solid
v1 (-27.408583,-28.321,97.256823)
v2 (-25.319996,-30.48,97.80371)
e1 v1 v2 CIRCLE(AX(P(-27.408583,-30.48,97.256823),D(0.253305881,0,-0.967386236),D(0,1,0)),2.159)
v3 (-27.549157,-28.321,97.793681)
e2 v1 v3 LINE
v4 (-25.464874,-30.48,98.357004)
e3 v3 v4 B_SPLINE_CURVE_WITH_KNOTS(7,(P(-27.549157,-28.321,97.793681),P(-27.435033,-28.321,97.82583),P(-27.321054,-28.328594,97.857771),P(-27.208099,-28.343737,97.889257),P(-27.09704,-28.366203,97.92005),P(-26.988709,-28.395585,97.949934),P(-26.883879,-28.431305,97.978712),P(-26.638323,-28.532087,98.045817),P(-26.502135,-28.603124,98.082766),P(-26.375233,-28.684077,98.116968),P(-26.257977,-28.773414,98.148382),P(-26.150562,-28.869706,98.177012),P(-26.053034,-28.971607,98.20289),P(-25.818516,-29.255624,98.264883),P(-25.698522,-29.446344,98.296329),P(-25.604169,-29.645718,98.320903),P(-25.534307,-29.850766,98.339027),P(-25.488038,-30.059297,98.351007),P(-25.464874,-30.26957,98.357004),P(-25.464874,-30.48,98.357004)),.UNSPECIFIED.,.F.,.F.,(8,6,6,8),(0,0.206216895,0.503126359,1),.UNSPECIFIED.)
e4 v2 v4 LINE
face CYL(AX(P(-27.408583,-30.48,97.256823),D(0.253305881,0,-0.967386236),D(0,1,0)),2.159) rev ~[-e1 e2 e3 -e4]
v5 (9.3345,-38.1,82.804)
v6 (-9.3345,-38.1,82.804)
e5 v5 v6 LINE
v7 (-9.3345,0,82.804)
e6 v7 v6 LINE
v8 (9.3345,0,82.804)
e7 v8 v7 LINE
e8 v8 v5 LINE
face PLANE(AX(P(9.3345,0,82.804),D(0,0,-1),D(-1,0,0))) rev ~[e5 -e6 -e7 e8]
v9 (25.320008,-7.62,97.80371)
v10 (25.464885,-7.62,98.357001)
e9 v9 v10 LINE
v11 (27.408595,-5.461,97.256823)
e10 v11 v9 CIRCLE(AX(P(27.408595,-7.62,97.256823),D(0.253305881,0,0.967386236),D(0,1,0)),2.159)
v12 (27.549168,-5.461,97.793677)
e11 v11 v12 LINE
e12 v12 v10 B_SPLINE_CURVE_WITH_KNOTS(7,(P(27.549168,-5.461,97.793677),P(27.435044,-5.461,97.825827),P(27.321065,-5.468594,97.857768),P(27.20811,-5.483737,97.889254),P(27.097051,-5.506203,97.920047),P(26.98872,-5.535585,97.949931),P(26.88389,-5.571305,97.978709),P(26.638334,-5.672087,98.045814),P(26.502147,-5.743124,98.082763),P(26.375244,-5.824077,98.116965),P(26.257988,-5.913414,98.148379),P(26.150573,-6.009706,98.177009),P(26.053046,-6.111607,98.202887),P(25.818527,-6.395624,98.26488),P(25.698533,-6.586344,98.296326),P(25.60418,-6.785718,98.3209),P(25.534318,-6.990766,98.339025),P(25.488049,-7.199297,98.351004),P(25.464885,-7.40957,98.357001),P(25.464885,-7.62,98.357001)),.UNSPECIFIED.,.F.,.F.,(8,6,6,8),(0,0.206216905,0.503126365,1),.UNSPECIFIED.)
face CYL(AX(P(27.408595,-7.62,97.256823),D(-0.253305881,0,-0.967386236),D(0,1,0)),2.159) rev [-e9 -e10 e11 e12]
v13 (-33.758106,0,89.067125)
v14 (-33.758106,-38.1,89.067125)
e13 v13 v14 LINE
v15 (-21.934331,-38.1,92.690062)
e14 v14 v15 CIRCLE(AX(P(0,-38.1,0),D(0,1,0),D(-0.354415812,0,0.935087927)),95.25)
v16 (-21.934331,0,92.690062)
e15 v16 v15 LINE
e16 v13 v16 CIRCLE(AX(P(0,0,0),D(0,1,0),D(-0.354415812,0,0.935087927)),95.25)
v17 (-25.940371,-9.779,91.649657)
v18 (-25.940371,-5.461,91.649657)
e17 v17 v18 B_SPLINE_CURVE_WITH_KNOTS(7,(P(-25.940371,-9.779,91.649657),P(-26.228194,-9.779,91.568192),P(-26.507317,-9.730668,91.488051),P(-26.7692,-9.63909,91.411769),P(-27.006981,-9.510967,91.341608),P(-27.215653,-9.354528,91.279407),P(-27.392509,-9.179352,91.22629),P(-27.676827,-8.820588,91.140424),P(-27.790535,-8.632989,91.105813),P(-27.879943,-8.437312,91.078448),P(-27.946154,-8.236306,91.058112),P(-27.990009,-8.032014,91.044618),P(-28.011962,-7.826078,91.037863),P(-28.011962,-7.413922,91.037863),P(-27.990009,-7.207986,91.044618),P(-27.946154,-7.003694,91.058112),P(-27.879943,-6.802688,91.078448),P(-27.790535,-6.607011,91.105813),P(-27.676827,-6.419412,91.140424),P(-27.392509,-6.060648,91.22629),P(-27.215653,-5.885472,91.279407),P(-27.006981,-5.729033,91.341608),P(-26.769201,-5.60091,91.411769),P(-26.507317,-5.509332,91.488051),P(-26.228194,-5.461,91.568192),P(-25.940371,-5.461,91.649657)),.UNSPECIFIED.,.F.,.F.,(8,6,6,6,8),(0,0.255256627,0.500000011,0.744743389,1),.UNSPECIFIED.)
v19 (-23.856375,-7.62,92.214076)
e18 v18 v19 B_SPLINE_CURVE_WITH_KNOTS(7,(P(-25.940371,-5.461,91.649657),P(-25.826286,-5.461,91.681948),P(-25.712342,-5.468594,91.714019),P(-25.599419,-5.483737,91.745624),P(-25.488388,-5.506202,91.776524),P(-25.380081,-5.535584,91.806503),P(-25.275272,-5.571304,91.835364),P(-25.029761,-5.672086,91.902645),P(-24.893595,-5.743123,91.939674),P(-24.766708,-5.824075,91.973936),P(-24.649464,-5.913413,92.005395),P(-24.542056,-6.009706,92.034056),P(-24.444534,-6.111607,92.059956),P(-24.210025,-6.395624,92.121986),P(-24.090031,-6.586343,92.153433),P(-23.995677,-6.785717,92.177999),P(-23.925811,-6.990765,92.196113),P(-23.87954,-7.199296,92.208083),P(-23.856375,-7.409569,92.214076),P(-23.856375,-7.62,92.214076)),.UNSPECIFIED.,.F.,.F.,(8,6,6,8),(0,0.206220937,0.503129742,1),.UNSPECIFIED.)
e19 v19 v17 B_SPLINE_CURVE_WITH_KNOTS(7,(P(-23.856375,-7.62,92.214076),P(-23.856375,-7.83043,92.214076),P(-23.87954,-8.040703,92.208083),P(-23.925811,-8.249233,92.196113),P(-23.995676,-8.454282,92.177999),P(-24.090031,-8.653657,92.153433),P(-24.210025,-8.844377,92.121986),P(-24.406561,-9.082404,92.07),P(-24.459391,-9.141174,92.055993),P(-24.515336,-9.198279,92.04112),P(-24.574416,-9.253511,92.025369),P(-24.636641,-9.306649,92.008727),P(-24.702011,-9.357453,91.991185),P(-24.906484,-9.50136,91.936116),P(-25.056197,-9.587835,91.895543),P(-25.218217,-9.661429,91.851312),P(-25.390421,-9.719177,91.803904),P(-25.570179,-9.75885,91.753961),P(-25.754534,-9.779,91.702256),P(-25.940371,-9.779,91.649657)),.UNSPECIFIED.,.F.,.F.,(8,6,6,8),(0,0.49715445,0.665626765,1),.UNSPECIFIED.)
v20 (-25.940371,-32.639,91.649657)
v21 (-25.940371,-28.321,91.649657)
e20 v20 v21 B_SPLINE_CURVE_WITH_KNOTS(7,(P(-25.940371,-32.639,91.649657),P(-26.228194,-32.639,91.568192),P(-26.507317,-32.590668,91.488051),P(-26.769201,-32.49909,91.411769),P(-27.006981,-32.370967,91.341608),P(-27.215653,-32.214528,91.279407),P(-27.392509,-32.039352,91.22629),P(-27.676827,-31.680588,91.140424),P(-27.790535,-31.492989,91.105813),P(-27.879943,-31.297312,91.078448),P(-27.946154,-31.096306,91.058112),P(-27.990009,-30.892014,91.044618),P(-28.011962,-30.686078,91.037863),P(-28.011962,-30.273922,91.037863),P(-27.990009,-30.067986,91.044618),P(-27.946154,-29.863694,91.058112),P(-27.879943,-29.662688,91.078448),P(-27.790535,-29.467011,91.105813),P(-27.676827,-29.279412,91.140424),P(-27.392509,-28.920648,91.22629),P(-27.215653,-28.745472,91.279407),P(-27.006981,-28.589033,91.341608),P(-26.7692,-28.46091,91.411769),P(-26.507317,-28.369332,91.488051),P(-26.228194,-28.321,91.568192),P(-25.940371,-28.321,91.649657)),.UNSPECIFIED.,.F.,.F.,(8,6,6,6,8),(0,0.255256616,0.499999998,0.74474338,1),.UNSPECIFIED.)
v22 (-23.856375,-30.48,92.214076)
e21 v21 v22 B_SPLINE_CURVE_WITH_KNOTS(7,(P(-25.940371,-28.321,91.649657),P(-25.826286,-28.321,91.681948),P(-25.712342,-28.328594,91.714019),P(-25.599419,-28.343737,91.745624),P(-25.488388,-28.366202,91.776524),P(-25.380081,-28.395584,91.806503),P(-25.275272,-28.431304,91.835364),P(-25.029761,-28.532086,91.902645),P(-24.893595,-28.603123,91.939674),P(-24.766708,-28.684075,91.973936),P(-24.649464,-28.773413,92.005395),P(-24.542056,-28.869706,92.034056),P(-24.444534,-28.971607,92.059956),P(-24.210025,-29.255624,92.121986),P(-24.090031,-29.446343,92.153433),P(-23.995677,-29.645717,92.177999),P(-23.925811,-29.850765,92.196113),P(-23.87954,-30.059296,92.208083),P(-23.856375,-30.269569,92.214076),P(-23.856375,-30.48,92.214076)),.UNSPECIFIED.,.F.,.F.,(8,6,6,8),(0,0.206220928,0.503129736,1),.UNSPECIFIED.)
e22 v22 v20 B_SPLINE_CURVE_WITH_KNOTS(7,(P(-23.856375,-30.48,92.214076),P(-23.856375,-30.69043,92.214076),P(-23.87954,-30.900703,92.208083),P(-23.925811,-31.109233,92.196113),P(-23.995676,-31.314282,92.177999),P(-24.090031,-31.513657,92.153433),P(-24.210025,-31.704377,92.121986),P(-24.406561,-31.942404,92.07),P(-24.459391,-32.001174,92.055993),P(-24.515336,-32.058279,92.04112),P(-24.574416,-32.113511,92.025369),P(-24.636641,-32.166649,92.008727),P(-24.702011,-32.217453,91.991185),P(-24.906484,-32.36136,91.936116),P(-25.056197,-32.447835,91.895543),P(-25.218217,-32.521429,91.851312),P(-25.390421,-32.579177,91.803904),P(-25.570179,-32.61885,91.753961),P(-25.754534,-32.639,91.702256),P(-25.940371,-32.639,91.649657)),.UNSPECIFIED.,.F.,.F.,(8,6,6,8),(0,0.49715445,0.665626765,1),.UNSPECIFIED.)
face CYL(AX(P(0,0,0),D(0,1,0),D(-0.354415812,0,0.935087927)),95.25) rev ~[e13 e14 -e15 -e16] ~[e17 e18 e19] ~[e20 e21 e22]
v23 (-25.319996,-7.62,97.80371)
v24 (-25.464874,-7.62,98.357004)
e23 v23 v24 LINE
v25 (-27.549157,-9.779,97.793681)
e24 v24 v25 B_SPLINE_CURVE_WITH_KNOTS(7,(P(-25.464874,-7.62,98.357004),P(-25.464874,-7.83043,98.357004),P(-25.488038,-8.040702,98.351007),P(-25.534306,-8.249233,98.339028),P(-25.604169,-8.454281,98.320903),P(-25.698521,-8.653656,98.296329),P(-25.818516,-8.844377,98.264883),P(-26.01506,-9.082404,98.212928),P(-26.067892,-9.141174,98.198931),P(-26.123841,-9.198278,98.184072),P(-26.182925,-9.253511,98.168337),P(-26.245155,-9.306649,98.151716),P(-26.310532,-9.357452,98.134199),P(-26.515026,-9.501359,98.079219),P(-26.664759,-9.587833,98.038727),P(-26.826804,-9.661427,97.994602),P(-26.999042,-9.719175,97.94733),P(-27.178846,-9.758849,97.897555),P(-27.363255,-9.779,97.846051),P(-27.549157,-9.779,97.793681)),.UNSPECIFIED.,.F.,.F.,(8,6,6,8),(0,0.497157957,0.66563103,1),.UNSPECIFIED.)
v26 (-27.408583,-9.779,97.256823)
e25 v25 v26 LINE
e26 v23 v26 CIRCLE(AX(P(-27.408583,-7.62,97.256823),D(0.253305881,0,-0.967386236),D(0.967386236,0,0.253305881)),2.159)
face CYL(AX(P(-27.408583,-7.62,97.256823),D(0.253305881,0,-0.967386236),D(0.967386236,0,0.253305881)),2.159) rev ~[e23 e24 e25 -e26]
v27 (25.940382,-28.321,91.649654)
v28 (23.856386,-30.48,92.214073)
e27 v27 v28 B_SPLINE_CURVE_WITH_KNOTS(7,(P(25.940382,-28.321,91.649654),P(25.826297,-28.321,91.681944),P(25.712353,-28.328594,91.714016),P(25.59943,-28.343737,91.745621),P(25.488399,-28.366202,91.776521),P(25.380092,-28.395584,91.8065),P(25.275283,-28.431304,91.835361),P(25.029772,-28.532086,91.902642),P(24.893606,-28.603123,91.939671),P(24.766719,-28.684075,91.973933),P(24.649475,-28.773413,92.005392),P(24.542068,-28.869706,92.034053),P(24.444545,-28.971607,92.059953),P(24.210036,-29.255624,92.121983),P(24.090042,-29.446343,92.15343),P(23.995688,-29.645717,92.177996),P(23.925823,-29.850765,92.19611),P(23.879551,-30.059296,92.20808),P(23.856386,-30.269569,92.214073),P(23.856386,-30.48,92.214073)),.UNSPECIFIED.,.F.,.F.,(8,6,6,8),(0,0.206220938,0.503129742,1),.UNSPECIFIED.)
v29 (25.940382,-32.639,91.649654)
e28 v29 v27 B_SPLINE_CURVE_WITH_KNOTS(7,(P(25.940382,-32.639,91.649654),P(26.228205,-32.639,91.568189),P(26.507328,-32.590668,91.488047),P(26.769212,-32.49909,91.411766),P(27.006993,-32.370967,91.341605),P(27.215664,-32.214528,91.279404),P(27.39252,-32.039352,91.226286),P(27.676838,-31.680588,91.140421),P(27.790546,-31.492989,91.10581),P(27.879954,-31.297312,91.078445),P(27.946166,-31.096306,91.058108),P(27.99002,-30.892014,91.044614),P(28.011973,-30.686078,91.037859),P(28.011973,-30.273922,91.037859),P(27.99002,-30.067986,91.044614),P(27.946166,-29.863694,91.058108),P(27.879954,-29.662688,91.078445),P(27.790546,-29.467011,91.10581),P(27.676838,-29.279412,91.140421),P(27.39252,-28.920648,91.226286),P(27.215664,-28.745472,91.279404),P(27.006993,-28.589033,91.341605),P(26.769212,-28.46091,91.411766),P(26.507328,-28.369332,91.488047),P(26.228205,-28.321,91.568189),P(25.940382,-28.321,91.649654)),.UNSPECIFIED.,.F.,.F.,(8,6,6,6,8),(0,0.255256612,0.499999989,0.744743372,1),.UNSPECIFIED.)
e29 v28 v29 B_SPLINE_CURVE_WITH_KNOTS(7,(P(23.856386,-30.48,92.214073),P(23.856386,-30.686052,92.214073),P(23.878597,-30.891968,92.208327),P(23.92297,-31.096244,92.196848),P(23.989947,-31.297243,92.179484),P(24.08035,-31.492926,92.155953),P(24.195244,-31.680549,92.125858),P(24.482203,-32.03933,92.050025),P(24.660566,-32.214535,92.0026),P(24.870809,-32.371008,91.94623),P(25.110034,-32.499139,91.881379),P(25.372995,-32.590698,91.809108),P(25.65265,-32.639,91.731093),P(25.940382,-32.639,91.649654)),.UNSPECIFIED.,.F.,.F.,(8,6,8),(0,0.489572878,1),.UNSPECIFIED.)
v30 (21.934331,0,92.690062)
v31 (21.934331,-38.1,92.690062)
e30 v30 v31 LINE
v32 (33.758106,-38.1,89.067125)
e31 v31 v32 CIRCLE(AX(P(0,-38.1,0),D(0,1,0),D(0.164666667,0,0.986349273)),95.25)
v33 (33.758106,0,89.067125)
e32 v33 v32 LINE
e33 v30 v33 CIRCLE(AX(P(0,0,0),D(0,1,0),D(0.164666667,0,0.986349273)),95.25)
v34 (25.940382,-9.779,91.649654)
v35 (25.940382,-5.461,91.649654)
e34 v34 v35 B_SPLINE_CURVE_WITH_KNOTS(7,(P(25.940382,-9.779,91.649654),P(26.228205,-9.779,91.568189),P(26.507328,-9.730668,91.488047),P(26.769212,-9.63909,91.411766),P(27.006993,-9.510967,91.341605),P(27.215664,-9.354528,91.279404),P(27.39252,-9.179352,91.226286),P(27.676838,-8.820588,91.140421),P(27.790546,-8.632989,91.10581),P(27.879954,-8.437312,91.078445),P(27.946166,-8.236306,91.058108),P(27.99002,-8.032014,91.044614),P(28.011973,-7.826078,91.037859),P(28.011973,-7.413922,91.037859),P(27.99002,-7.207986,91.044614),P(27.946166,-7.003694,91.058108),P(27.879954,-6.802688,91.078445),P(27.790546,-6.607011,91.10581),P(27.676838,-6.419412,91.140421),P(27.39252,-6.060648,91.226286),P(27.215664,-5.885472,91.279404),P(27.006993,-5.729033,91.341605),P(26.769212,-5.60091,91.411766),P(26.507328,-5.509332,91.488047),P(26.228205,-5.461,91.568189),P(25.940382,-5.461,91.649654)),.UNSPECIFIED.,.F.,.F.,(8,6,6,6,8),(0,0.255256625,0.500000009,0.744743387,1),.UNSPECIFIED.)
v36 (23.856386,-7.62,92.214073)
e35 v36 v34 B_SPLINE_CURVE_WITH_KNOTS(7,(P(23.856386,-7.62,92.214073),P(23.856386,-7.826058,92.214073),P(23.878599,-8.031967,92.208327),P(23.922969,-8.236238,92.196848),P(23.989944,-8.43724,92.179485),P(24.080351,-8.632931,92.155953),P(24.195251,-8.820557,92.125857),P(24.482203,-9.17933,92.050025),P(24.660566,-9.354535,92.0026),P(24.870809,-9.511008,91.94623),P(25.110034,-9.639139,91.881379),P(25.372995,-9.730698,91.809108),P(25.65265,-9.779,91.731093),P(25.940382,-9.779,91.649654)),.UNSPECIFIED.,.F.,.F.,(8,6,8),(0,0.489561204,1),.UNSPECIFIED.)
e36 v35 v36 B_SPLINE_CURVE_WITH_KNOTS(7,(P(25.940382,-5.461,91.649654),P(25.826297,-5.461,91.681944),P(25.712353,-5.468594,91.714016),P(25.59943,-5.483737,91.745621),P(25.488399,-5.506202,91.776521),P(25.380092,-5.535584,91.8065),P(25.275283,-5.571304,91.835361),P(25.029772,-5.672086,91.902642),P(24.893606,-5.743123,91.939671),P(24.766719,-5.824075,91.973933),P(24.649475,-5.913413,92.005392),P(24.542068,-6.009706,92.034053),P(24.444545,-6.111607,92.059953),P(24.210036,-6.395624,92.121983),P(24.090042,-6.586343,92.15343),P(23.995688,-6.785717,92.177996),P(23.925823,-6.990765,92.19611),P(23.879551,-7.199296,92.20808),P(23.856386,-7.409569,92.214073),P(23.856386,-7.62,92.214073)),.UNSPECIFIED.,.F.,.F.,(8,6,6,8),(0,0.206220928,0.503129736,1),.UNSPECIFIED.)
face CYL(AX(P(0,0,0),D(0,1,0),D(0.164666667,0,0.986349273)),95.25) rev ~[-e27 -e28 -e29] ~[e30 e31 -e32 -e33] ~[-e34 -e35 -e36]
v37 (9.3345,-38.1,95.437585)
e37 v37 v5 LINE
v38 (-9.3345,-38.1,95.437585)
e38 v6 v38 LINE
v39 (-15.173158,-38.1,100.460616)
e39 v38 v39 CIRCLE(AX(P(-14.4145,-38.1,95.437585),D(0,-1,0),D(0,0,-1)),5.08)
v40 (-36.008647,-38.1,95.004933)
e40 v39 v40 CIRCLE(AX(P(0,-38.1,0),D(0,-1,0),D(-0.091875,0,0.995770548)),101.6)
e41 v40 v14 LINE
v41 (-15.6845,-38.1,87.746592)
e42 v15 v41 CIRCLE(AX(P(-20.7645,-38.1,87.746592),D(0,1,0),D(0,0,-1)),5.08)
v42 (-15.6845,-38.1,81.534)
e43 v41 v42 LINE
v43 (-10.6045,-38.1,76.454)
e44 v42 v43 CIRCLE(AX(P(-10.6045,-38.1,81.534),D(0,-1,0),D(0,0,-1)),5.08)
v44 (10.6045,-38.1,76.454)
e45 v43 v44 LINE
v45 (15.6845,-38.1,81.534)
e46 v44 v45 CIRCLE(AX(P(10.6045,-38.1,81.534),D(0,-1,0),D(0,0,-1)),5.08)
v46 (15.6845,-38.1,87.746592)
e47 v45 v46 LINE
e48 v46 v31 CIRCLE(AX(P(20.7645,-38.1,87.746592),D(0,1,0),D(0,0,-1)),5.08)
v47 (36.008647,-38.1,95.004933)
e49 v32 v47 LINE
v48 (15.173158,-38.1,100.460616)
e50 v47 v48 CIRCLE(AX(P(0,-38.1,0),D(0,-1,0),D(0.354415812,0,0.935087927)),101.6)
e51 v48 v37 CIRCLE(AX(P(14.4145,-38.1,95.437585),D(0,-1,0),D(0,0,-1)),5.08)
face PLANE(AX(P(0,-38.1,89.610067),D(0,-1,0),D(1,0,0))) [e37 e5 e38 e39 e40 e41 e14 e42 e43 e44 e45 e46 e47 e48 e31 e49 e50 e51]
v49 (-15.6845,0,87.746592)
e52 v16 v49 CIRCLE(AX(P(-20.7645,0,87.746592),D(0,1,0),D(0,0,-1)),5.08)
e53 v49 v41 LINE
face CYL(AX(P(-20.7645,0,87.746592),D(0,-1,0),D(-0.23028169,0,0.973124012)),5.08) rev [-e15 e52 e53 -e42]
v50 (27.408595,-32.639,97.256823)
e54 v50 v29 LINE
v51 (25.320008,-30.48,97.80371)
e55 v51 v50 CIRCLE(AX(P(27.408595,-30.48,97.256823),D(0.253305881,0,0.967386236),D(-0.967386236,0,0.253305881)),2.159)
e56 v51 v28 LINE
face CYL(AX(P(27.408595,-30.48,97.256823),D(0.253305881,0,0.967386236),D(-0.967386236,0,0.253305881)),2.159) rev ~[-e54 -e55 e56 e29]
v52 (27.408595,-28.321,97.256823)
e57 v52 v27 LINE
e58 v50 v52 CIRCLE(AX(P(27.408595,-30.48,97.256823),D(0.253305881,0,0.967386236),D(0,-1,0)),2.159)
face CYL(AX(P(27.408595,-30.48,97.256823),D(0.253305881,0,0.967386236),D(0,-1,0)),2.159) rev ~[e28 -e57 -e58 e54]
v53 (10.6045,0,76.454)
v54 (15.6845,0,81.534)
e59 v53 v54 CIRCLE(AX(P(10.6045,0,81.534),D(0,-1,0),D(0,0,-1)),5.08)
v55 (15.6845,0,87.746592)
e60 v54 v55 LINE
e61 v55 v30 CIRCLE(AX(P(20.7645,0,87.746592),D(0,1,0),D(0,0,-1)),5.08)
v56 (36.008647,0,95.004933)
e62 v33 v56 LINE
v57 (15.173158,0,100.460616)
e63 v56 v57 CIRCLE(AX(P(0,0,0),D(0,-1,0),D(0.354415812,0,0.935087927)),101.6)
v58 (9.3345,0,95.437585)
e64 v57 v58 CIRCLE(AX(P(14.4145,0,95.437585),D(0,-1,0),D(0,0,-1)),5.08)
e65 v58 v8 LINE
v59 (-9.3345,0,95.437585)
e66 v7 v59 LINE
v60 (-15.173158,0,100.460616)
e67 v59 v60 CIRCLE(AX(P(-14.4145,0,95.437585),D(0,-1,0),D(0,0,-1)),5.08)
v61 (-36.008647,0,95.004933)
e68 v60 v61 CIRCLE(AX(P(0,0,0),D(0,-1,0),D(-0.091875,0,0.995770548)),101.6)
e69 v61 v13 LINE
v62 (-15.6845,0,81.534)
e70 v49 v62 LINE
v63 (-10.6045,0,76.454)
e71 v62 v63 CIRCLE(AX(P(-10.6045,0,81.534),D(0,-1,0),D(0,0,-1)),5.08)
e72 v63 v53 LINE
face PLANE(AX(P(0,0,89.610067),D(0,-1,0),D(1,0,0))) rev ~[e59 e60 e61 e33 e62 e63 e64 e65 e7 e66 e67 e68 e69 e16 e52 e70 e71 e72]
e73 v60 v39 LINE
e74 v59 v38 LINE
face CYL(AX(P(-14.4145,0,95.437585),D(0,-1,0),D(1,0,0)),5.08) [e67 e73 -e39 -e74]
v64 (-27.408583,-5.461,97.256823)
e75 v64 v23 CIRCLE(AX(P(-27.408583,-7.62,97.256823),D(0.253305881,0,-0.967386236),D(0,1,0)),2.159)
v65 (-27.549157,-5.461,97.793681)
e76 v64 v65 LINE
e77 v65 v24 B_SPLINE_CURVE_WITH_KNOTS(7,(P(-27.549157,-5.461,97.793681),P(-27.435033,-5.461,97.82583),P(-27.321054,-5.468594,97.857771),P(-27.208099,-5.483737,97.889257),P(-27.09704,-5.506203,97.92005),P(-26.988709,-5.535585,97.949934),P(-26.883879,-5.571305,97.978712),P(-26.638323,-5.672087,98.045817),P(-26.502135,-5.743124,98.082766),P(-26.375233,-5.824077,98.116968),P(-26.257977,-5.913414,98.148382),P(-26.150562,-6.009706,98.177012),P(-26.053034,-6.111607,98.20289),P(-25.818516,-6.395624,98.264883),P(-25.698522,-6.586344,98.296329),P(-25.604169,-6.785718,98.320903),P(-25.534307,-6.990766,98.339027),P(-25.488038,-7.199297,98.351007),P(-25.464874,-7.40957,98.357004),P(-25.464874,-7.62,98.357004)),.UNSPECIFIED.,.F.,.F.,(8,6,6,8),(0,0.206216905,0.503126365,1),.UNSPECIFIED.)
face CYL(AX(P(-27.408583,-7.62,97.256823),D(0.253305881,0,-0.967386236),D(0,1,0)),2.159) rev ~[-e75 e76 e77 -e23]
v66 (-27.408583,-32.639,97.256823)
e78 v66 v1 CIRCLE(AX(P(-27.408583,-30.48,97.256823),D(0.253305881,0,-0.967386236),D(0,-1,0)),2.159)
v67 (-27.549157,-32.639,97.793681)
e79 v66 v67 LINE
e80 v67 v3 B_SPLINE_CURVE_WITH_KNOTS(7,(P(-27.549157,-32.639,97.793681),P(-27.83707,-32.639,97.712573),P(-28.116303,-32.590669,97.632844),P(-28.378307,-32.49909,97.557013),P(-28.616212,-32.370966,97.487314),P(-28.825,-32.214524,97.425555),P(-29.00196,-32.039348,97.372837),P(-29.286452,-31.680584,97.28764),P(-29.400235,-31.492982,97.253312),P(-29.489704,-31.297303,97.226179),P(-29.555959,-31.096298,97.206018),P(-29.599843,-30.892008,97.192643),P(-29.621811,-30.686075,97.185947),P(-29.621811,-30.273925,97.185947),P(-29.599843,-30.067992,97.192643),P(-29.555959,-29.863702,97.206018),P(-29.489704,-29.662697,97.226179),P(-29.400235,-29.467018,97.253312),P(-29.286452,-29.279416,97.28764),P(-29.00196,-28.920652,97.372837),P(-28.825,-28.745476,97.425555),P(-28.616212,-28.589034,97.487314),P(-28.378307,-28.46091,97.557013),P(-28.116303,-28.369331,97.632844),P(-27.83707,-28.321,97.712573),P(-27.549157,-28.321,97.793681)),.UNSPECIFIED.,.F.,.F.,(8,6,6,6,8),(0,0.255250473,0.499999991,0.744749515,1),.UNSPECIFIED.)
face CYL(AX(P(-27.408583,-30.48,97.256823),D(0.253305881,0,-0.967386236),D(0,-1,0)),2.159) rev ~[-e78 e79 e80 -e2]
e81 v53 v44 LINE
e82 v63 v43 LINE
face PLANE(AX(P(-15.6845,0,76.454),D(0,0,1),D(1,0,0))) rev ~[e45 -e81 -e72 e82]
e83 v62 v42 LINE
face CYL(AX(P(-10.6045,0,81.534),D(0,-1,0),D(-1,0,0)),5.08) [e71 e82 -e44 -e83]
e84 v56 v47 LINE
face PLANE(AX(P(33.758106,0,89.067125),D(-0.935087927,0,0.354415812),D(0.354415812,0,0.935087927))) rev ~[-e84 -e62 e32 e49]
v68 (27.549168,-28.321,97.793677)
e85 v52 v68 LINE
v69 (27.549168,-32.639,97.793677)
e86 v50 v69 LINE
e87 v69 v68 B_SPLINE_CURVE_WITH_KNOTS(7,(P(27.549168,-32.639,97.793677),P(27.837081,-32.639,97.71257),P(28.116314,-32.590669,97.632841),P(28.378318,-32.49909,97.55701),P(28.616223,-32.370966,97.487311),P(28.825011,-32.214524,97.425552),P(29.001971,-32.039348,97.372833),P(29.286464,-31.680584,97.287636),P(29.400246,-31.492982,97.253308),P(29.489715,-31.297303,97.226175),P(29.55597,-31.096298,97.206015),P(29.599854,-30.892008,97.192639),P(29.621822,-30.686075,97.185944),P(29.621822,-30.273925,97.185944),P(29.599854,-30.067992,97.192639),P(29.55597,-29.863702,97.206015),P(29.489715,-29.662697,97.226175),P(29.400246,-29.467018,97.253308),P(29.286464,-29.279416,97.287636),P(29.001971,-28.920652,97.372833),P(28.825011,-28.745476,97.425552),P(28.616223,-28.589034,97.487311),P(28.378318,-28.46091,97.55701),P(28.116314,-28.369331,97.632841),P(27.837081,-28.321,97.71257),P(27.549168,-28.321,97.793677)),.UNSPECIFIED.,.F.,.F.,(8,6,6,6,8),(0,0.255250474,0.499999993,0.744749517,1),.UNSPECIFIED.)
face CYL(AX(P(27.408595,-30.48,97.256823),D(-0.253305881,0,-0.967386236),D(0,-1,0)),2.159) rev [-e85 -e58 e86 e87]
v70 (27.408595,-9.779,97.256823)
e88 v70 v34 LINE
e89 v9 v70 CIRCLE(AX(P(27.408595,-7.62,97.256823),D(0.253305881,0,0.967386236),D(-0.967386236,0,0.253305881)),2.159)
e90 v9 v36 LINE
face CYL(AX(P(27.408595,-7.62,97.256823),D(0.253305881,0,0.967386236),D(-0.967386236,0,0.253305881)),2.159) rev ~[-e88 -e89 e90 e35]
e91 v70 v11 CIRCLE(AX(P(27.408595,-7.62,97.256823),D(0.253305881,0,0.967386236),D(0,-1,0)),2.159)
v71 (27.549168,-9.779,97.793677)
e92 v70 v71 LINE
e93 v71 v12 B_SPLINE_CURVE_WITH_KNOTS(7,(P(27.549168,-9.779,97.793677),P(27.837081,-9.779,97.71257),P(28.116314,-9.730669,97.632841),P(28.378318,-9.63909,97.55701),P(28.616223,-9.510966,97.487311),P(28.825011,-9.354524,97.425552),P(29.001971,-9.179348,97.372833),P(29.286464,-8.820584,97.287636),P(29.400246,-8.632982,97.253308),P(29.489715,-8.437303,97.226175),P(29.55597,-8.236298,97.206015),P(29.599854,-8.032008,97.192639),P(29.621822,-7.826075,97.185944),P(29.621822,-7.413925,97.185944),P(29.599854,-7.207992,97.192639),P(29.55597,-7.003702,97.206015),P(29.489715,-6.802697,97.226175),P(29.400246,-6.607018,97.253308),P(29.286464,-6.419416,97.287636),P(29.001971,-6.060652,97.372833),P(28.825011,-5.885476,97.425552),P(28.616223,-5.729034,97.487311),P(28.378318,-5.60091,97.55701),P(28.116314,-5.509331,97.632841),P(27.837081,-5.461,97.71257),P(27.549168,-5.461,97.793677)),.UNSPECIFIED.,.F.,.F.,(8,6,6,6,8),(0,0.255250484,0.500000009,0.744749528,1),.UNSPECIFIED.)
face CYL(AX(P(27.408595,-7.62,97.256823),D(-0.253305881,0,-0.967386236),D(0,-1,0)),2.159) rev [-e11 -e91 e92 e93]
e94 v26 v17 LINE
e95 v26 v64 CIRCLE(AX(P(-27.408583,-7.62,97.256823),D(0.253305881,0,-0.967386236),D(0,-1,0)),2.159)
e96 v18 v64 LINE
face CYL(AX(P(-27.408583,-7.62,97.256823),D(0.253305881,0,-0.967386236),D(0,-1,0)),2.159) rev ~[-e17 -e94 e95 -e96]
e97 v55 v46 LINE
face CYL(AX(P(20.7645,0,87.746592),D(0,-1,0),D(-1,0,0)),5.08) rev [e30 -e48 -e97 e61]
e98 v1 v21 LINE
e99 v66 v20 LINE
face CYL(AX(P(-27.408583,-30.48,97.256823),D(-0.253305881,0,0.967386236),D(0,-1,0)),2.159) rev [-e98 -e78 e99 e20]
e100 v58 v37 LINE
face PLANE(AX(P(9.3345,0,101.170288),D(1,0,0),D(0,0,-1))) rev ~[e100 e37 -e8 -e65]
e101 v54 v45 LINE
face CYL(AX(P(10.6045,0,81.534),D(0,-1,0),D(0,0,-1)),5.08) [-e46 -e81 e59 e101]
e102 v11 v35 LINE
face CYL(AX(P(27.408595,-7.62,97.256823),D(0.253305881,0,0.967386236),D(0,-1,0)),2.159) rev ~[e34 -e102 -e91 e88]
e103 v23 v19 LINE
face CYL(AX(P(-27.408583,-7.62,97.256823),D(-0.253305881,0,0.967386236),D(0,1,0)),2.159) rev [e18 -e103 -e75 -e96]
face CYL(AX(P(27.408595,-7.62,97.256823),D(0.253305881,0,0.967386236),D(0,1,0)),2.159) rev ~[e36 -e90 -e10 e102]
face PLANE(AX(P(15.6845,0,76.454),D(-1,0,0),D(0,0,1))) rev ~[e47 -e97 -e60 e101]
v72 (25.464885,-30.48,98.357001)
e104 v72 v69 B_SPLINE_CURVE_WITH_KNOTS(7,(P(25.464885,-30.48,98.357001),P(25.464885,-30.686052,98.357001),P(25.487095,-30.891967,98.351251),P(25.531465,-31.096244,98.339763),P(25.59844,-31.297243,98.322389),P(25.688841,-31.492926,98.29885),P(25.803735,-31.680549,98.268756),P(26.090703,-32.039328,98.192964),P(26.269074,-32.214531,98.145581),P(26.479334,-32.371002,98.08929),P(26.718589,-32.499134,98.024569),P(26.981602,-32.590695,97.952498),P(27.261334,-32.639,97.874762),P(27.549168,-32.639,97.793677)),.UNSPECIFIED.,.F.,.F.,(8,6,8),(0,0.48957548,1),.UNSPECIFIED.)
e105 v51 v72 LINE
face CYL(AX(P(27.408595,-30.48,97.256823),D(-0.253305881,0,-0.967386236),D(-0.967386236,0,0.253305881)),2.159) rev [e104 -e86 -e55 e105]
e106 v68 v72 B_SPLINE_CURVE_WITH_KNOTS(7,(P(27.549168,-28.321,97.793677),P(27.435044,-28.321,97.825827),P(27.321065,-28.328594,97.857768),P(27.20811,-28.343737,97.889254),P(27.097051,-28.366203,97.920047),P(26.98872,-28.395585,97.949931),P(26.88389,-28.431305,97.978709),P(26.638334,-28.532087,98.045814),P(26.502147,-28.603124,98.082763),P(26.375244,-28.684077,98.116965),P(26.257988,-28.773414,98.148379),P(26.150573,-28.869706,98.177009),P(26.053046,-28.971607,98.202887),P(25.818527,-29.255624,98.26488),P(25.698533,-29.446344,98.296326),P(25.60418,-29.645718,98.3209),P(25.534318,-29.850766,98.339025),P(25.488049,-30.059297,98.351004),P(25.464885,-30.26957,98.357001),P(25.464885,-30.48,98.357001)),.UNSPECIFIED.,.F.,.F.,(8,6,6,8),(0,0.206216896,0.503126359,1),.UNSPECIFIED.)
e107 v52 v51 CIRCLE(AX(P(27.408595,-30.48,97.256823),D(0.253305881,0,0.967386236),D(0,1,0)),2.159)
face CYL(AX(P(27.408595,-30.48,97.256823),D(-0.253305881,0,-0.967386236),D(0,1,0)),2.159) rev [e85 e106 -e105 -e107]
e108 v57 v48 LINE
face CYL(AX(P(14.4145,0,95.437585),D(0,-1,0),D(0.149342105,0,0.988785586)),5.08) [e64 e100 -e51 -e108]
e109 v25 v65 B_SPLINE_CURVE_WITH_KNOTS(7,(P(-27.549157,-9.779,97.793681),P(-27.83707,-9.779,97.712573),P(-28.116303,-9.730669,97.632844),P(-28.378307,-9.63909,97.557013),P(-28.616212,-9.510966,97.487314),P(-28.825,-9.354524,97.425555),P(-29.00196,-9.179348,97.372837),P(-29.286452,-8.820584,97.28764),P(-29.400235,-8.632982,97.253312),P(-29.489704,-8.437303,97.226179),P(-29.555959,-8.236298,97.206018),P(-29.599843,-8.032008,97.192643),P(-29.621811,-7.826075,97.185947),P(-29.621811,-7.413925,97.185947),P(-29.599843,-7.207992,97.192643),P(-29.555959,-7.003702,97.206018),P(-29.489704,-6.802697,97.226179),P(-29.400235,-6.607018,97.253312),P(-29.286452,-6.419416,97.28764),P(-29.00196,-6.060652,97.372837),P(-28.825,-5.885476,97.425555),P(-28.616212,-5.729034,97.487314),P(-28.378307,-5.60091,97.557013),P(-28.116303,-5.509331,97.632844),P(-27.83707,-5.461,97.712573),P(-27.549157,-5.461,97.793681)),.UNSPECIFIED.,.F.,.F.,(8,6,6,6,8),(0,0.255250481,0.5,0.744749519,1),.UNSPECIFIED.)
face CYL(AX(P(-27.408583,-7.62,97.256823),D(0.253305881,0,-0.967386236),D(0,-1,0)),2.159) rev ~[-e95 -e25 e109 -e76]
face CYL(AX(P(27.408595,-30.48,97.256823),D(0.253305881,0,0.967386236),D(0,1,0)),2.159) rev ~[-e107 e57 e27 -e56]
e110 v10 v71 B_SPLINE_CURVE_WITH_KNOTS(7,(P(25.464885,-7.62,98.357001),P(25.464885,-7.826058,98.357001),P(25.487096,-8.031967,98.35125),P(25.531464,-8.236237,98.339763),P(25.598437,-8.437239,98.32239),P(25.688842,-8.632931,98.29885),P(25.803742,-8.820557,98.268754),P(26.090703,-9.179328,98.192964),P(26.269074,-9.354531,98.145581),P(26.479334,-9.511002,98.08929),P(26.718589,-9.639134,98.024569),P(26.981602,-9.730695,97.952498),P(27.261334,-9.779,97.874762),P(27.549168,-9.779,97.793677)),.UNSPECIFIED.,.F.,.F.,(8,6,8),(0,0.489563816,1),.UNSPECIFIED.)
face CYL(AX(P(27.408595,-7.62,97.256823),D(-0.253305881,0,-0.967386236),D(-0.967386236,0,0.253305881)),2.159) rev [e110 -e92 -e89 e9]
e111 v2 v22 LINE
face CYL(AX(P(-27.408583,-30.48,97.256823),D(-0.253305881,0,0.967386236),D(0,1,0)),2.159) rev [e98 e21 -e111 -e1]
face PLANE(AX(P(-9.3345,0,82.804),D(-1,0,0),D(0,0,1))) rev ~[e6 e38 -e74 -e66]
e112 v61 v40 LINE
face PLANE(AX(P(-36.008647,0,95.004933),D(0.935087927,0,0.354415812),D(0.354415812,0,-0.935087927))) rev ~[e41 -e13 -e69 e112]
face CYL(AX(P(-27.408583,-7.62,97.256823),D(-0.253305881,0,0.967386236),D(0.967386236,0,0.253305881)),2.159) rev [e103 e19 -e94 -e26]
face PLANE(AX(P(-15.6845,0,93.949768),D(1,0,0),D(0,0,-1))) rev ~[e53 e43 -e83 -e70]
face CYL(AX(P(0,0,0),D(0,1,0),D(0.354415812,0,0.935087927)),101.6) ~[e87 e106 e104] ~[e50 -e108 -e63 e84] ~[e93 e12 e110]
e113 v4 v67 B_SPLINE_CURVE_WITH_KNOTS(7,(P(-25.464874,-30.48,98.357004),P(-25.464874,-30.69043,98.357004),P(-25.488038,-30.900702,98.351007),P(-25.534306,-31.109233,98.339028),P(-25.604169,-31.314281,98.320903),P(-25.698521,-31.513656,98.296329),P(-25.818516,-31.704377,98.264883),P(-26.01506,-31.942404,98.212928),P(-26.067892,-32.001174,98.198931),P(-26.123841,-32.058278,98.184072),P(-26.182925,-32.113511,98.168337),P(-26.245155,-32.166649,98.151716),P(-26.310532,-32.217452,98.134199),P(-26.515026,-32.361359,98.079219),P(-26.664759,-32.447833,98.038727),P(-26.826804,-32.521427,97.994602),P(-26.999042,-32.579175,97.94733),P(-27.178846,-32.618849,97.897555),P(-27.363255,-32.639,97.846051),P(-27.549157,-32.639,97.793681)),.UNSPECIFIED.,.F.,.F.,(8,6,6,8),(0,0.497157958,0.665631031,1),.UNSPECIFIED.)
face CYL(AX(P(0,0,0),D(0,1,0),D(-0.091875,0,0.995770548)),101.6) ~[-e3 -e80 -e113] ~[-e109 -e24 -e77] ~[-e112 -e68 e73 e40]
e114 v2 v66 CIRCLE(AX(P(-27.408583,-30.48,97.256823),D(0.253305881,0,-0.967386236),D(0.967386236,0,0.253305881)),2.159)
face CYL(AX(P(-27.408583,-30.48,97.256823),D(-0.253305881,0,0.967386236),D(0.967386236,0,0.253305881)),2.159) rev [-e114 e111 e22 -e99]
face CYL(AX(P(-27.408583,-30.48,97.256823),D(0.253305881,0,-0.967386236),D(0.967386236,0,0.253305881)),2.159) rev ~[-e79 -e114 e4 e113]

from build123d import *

# Parameters (mm, degrees)
F1_DEPTH = 38.1
F2_R     = 5.08
F7_DEPTH = 12.7
F8_DEPTH = 12.7


# Not quite as in the source:
# - a pattern or mirror of a feature is missing from the dataset's text; its kind, count and spacing are read off the source's solid


with BuildPart() as f1:
    # F0 (on Front) → F1 (new body)
    with BuildSketch(Plane.XZ):
        with BuildLine():
            Line((-9.3345, 82.804), (-9.3345, 101.1702876825))
            ThreePointArc((-9.3345, 101.1702876825), (-22.880190841, 98.9901857109), (-36.0086465439, 95.0049334197))
            Line((-36.0086465439, 95.0049334197), (-33.7581061349, 89.067125081))
            ThreePointArc((-33.7581061349, 89.067125081), (-24.8415554365, 91.9535731959), (-15.6845, 93.9497682794))
            Line((-15.6845, 93.9497682794), (-15.6845, 76.454))
            Line((-15.6845, 76.454), (15.6845, 76.454))
            Line((15.6845, 76.454), (15.6845, 93.9497682794))
            ThreePointArc((15.6845, 93.9497682794), (24.8415554365, 91.9535731959), (33.7581061349, 89.067125081))
            Line((33.7581061349, 89.067125081), (36.0086465439, 95.0049334197))
            ThreePointArc((36.0086465439, 95.0049334197), (22.880190841, 98.9901857109), (9.3345, 101.1702876825))
            Line((9.3345, 101.1702876825), (9.3345, 82.804))
            Line((9.3345, 82.804), (-9.3345, 82.804))
        make_face()
    extrude(amount=F1_DEPTH)

    # F2
    f2_edges = [f1.edges().sort_by_distance(p)[0] for p in [
        (-9.3345, -19.05, 101.170288),
        (9.3345, -19.05, 101.170288),
        (15.6845, -19.05, 93.949768),
        (-15.6845, -19.05, 93.949768),
        (15.6845, -19.05, 76.454),
        (-15.6845, -19.05, 76.454),
    ]]
    fillet(f2_edges, radius=F2_R)

    # F4 (on face) → F7 (cut, symmetric)
    with BuildSketch(Plane(origin=(-25.5909022193, 0, 97.7327744919), x_dir=(0.9673862364, 0, 0.2533058814), z_dir=(0.2533058814, 0, -0.9673862364))):
        with BuildLine():
            Line((-1.8789606614, 5.461), (-1.8789606614, 9.779))
            ThreePointArc((-1.8789606614, 9.779), (-4.0379606614, 7.62), (-1.8789606614, 5.461))
        make_face()
    extrude(amount=F7_DEPTH, both=True, mode=Mode.SUBTRACT)

    # F4 (on face) → F8 (cut, symmetric)
    with BuildSketch(Plane(origin=(-25.5909022193, 0, 97.7327744919), x_dir=(0.9673862364, 0, 0.2533058814), z_dir=(0.2533058814, 0, -0.9673862364))):
        with BuildLine():
            ThreePointArc((-1.8789606614, 32.639), (-4.0379606614, 30.48), (-1.8789606614, 28.321))
            Line((-1.8789606614, 28.321), (-1.8789606614, 30.48))
            Line((-1.8789606614, 30.48), (-1.8789606614, 32.639))
        make_face()
        with BuildLine():
            Line((-1.8789606614, 30.48), (-1.8789606614, 28.321))
            ThreePointArc((-1.8789606614, 28.321), (-0.3523171208, 28.9533564594), (0.2800393386, 30.48))
            ThreePointArc((0.2800393386, 30.48), (-0.3523171208, 32.0066435406), (-1.8789606614, 32.639))
            Line((-1.8789606614, 32.639), (-1.8789606614, 30.48))
        make_face()
        with BuildLine():
            ThreePointArc((-1.8789606614, 5.461), (-0.3523171208, 6.0933564594), (0.2800393386, 7.62))
            ThreePointArc((0.2800393386, 7.62), (-0.3523171208, 9.1466435406), (-1.8789606614, 9.779))
            Line((-1.8789606614, 9.779), (-1.8789606614, 5.461))
        make_face()
        with BuildLine():
            Line((-1.8789606614, 5.461), (-1.8789606614, 9.779))
            ThreePointArc((-1.8789606614, 9.779), (-4.0379606614, 7.62), (-1.8789606614, 5.461))
        make_face()
    f8 = extrude(amount=F8_DEPTH, both=True, mode=Mode.SUBTRACT)

    # F8_copies: F8 across plane
    add(f8.mirror(Plane(origin=(6e-06, 0, 0), x_dir=(0, 0, 1), z_dir=(1, 0, 0))), mode=Mode.SUBTRACT)


solid = f1.part
